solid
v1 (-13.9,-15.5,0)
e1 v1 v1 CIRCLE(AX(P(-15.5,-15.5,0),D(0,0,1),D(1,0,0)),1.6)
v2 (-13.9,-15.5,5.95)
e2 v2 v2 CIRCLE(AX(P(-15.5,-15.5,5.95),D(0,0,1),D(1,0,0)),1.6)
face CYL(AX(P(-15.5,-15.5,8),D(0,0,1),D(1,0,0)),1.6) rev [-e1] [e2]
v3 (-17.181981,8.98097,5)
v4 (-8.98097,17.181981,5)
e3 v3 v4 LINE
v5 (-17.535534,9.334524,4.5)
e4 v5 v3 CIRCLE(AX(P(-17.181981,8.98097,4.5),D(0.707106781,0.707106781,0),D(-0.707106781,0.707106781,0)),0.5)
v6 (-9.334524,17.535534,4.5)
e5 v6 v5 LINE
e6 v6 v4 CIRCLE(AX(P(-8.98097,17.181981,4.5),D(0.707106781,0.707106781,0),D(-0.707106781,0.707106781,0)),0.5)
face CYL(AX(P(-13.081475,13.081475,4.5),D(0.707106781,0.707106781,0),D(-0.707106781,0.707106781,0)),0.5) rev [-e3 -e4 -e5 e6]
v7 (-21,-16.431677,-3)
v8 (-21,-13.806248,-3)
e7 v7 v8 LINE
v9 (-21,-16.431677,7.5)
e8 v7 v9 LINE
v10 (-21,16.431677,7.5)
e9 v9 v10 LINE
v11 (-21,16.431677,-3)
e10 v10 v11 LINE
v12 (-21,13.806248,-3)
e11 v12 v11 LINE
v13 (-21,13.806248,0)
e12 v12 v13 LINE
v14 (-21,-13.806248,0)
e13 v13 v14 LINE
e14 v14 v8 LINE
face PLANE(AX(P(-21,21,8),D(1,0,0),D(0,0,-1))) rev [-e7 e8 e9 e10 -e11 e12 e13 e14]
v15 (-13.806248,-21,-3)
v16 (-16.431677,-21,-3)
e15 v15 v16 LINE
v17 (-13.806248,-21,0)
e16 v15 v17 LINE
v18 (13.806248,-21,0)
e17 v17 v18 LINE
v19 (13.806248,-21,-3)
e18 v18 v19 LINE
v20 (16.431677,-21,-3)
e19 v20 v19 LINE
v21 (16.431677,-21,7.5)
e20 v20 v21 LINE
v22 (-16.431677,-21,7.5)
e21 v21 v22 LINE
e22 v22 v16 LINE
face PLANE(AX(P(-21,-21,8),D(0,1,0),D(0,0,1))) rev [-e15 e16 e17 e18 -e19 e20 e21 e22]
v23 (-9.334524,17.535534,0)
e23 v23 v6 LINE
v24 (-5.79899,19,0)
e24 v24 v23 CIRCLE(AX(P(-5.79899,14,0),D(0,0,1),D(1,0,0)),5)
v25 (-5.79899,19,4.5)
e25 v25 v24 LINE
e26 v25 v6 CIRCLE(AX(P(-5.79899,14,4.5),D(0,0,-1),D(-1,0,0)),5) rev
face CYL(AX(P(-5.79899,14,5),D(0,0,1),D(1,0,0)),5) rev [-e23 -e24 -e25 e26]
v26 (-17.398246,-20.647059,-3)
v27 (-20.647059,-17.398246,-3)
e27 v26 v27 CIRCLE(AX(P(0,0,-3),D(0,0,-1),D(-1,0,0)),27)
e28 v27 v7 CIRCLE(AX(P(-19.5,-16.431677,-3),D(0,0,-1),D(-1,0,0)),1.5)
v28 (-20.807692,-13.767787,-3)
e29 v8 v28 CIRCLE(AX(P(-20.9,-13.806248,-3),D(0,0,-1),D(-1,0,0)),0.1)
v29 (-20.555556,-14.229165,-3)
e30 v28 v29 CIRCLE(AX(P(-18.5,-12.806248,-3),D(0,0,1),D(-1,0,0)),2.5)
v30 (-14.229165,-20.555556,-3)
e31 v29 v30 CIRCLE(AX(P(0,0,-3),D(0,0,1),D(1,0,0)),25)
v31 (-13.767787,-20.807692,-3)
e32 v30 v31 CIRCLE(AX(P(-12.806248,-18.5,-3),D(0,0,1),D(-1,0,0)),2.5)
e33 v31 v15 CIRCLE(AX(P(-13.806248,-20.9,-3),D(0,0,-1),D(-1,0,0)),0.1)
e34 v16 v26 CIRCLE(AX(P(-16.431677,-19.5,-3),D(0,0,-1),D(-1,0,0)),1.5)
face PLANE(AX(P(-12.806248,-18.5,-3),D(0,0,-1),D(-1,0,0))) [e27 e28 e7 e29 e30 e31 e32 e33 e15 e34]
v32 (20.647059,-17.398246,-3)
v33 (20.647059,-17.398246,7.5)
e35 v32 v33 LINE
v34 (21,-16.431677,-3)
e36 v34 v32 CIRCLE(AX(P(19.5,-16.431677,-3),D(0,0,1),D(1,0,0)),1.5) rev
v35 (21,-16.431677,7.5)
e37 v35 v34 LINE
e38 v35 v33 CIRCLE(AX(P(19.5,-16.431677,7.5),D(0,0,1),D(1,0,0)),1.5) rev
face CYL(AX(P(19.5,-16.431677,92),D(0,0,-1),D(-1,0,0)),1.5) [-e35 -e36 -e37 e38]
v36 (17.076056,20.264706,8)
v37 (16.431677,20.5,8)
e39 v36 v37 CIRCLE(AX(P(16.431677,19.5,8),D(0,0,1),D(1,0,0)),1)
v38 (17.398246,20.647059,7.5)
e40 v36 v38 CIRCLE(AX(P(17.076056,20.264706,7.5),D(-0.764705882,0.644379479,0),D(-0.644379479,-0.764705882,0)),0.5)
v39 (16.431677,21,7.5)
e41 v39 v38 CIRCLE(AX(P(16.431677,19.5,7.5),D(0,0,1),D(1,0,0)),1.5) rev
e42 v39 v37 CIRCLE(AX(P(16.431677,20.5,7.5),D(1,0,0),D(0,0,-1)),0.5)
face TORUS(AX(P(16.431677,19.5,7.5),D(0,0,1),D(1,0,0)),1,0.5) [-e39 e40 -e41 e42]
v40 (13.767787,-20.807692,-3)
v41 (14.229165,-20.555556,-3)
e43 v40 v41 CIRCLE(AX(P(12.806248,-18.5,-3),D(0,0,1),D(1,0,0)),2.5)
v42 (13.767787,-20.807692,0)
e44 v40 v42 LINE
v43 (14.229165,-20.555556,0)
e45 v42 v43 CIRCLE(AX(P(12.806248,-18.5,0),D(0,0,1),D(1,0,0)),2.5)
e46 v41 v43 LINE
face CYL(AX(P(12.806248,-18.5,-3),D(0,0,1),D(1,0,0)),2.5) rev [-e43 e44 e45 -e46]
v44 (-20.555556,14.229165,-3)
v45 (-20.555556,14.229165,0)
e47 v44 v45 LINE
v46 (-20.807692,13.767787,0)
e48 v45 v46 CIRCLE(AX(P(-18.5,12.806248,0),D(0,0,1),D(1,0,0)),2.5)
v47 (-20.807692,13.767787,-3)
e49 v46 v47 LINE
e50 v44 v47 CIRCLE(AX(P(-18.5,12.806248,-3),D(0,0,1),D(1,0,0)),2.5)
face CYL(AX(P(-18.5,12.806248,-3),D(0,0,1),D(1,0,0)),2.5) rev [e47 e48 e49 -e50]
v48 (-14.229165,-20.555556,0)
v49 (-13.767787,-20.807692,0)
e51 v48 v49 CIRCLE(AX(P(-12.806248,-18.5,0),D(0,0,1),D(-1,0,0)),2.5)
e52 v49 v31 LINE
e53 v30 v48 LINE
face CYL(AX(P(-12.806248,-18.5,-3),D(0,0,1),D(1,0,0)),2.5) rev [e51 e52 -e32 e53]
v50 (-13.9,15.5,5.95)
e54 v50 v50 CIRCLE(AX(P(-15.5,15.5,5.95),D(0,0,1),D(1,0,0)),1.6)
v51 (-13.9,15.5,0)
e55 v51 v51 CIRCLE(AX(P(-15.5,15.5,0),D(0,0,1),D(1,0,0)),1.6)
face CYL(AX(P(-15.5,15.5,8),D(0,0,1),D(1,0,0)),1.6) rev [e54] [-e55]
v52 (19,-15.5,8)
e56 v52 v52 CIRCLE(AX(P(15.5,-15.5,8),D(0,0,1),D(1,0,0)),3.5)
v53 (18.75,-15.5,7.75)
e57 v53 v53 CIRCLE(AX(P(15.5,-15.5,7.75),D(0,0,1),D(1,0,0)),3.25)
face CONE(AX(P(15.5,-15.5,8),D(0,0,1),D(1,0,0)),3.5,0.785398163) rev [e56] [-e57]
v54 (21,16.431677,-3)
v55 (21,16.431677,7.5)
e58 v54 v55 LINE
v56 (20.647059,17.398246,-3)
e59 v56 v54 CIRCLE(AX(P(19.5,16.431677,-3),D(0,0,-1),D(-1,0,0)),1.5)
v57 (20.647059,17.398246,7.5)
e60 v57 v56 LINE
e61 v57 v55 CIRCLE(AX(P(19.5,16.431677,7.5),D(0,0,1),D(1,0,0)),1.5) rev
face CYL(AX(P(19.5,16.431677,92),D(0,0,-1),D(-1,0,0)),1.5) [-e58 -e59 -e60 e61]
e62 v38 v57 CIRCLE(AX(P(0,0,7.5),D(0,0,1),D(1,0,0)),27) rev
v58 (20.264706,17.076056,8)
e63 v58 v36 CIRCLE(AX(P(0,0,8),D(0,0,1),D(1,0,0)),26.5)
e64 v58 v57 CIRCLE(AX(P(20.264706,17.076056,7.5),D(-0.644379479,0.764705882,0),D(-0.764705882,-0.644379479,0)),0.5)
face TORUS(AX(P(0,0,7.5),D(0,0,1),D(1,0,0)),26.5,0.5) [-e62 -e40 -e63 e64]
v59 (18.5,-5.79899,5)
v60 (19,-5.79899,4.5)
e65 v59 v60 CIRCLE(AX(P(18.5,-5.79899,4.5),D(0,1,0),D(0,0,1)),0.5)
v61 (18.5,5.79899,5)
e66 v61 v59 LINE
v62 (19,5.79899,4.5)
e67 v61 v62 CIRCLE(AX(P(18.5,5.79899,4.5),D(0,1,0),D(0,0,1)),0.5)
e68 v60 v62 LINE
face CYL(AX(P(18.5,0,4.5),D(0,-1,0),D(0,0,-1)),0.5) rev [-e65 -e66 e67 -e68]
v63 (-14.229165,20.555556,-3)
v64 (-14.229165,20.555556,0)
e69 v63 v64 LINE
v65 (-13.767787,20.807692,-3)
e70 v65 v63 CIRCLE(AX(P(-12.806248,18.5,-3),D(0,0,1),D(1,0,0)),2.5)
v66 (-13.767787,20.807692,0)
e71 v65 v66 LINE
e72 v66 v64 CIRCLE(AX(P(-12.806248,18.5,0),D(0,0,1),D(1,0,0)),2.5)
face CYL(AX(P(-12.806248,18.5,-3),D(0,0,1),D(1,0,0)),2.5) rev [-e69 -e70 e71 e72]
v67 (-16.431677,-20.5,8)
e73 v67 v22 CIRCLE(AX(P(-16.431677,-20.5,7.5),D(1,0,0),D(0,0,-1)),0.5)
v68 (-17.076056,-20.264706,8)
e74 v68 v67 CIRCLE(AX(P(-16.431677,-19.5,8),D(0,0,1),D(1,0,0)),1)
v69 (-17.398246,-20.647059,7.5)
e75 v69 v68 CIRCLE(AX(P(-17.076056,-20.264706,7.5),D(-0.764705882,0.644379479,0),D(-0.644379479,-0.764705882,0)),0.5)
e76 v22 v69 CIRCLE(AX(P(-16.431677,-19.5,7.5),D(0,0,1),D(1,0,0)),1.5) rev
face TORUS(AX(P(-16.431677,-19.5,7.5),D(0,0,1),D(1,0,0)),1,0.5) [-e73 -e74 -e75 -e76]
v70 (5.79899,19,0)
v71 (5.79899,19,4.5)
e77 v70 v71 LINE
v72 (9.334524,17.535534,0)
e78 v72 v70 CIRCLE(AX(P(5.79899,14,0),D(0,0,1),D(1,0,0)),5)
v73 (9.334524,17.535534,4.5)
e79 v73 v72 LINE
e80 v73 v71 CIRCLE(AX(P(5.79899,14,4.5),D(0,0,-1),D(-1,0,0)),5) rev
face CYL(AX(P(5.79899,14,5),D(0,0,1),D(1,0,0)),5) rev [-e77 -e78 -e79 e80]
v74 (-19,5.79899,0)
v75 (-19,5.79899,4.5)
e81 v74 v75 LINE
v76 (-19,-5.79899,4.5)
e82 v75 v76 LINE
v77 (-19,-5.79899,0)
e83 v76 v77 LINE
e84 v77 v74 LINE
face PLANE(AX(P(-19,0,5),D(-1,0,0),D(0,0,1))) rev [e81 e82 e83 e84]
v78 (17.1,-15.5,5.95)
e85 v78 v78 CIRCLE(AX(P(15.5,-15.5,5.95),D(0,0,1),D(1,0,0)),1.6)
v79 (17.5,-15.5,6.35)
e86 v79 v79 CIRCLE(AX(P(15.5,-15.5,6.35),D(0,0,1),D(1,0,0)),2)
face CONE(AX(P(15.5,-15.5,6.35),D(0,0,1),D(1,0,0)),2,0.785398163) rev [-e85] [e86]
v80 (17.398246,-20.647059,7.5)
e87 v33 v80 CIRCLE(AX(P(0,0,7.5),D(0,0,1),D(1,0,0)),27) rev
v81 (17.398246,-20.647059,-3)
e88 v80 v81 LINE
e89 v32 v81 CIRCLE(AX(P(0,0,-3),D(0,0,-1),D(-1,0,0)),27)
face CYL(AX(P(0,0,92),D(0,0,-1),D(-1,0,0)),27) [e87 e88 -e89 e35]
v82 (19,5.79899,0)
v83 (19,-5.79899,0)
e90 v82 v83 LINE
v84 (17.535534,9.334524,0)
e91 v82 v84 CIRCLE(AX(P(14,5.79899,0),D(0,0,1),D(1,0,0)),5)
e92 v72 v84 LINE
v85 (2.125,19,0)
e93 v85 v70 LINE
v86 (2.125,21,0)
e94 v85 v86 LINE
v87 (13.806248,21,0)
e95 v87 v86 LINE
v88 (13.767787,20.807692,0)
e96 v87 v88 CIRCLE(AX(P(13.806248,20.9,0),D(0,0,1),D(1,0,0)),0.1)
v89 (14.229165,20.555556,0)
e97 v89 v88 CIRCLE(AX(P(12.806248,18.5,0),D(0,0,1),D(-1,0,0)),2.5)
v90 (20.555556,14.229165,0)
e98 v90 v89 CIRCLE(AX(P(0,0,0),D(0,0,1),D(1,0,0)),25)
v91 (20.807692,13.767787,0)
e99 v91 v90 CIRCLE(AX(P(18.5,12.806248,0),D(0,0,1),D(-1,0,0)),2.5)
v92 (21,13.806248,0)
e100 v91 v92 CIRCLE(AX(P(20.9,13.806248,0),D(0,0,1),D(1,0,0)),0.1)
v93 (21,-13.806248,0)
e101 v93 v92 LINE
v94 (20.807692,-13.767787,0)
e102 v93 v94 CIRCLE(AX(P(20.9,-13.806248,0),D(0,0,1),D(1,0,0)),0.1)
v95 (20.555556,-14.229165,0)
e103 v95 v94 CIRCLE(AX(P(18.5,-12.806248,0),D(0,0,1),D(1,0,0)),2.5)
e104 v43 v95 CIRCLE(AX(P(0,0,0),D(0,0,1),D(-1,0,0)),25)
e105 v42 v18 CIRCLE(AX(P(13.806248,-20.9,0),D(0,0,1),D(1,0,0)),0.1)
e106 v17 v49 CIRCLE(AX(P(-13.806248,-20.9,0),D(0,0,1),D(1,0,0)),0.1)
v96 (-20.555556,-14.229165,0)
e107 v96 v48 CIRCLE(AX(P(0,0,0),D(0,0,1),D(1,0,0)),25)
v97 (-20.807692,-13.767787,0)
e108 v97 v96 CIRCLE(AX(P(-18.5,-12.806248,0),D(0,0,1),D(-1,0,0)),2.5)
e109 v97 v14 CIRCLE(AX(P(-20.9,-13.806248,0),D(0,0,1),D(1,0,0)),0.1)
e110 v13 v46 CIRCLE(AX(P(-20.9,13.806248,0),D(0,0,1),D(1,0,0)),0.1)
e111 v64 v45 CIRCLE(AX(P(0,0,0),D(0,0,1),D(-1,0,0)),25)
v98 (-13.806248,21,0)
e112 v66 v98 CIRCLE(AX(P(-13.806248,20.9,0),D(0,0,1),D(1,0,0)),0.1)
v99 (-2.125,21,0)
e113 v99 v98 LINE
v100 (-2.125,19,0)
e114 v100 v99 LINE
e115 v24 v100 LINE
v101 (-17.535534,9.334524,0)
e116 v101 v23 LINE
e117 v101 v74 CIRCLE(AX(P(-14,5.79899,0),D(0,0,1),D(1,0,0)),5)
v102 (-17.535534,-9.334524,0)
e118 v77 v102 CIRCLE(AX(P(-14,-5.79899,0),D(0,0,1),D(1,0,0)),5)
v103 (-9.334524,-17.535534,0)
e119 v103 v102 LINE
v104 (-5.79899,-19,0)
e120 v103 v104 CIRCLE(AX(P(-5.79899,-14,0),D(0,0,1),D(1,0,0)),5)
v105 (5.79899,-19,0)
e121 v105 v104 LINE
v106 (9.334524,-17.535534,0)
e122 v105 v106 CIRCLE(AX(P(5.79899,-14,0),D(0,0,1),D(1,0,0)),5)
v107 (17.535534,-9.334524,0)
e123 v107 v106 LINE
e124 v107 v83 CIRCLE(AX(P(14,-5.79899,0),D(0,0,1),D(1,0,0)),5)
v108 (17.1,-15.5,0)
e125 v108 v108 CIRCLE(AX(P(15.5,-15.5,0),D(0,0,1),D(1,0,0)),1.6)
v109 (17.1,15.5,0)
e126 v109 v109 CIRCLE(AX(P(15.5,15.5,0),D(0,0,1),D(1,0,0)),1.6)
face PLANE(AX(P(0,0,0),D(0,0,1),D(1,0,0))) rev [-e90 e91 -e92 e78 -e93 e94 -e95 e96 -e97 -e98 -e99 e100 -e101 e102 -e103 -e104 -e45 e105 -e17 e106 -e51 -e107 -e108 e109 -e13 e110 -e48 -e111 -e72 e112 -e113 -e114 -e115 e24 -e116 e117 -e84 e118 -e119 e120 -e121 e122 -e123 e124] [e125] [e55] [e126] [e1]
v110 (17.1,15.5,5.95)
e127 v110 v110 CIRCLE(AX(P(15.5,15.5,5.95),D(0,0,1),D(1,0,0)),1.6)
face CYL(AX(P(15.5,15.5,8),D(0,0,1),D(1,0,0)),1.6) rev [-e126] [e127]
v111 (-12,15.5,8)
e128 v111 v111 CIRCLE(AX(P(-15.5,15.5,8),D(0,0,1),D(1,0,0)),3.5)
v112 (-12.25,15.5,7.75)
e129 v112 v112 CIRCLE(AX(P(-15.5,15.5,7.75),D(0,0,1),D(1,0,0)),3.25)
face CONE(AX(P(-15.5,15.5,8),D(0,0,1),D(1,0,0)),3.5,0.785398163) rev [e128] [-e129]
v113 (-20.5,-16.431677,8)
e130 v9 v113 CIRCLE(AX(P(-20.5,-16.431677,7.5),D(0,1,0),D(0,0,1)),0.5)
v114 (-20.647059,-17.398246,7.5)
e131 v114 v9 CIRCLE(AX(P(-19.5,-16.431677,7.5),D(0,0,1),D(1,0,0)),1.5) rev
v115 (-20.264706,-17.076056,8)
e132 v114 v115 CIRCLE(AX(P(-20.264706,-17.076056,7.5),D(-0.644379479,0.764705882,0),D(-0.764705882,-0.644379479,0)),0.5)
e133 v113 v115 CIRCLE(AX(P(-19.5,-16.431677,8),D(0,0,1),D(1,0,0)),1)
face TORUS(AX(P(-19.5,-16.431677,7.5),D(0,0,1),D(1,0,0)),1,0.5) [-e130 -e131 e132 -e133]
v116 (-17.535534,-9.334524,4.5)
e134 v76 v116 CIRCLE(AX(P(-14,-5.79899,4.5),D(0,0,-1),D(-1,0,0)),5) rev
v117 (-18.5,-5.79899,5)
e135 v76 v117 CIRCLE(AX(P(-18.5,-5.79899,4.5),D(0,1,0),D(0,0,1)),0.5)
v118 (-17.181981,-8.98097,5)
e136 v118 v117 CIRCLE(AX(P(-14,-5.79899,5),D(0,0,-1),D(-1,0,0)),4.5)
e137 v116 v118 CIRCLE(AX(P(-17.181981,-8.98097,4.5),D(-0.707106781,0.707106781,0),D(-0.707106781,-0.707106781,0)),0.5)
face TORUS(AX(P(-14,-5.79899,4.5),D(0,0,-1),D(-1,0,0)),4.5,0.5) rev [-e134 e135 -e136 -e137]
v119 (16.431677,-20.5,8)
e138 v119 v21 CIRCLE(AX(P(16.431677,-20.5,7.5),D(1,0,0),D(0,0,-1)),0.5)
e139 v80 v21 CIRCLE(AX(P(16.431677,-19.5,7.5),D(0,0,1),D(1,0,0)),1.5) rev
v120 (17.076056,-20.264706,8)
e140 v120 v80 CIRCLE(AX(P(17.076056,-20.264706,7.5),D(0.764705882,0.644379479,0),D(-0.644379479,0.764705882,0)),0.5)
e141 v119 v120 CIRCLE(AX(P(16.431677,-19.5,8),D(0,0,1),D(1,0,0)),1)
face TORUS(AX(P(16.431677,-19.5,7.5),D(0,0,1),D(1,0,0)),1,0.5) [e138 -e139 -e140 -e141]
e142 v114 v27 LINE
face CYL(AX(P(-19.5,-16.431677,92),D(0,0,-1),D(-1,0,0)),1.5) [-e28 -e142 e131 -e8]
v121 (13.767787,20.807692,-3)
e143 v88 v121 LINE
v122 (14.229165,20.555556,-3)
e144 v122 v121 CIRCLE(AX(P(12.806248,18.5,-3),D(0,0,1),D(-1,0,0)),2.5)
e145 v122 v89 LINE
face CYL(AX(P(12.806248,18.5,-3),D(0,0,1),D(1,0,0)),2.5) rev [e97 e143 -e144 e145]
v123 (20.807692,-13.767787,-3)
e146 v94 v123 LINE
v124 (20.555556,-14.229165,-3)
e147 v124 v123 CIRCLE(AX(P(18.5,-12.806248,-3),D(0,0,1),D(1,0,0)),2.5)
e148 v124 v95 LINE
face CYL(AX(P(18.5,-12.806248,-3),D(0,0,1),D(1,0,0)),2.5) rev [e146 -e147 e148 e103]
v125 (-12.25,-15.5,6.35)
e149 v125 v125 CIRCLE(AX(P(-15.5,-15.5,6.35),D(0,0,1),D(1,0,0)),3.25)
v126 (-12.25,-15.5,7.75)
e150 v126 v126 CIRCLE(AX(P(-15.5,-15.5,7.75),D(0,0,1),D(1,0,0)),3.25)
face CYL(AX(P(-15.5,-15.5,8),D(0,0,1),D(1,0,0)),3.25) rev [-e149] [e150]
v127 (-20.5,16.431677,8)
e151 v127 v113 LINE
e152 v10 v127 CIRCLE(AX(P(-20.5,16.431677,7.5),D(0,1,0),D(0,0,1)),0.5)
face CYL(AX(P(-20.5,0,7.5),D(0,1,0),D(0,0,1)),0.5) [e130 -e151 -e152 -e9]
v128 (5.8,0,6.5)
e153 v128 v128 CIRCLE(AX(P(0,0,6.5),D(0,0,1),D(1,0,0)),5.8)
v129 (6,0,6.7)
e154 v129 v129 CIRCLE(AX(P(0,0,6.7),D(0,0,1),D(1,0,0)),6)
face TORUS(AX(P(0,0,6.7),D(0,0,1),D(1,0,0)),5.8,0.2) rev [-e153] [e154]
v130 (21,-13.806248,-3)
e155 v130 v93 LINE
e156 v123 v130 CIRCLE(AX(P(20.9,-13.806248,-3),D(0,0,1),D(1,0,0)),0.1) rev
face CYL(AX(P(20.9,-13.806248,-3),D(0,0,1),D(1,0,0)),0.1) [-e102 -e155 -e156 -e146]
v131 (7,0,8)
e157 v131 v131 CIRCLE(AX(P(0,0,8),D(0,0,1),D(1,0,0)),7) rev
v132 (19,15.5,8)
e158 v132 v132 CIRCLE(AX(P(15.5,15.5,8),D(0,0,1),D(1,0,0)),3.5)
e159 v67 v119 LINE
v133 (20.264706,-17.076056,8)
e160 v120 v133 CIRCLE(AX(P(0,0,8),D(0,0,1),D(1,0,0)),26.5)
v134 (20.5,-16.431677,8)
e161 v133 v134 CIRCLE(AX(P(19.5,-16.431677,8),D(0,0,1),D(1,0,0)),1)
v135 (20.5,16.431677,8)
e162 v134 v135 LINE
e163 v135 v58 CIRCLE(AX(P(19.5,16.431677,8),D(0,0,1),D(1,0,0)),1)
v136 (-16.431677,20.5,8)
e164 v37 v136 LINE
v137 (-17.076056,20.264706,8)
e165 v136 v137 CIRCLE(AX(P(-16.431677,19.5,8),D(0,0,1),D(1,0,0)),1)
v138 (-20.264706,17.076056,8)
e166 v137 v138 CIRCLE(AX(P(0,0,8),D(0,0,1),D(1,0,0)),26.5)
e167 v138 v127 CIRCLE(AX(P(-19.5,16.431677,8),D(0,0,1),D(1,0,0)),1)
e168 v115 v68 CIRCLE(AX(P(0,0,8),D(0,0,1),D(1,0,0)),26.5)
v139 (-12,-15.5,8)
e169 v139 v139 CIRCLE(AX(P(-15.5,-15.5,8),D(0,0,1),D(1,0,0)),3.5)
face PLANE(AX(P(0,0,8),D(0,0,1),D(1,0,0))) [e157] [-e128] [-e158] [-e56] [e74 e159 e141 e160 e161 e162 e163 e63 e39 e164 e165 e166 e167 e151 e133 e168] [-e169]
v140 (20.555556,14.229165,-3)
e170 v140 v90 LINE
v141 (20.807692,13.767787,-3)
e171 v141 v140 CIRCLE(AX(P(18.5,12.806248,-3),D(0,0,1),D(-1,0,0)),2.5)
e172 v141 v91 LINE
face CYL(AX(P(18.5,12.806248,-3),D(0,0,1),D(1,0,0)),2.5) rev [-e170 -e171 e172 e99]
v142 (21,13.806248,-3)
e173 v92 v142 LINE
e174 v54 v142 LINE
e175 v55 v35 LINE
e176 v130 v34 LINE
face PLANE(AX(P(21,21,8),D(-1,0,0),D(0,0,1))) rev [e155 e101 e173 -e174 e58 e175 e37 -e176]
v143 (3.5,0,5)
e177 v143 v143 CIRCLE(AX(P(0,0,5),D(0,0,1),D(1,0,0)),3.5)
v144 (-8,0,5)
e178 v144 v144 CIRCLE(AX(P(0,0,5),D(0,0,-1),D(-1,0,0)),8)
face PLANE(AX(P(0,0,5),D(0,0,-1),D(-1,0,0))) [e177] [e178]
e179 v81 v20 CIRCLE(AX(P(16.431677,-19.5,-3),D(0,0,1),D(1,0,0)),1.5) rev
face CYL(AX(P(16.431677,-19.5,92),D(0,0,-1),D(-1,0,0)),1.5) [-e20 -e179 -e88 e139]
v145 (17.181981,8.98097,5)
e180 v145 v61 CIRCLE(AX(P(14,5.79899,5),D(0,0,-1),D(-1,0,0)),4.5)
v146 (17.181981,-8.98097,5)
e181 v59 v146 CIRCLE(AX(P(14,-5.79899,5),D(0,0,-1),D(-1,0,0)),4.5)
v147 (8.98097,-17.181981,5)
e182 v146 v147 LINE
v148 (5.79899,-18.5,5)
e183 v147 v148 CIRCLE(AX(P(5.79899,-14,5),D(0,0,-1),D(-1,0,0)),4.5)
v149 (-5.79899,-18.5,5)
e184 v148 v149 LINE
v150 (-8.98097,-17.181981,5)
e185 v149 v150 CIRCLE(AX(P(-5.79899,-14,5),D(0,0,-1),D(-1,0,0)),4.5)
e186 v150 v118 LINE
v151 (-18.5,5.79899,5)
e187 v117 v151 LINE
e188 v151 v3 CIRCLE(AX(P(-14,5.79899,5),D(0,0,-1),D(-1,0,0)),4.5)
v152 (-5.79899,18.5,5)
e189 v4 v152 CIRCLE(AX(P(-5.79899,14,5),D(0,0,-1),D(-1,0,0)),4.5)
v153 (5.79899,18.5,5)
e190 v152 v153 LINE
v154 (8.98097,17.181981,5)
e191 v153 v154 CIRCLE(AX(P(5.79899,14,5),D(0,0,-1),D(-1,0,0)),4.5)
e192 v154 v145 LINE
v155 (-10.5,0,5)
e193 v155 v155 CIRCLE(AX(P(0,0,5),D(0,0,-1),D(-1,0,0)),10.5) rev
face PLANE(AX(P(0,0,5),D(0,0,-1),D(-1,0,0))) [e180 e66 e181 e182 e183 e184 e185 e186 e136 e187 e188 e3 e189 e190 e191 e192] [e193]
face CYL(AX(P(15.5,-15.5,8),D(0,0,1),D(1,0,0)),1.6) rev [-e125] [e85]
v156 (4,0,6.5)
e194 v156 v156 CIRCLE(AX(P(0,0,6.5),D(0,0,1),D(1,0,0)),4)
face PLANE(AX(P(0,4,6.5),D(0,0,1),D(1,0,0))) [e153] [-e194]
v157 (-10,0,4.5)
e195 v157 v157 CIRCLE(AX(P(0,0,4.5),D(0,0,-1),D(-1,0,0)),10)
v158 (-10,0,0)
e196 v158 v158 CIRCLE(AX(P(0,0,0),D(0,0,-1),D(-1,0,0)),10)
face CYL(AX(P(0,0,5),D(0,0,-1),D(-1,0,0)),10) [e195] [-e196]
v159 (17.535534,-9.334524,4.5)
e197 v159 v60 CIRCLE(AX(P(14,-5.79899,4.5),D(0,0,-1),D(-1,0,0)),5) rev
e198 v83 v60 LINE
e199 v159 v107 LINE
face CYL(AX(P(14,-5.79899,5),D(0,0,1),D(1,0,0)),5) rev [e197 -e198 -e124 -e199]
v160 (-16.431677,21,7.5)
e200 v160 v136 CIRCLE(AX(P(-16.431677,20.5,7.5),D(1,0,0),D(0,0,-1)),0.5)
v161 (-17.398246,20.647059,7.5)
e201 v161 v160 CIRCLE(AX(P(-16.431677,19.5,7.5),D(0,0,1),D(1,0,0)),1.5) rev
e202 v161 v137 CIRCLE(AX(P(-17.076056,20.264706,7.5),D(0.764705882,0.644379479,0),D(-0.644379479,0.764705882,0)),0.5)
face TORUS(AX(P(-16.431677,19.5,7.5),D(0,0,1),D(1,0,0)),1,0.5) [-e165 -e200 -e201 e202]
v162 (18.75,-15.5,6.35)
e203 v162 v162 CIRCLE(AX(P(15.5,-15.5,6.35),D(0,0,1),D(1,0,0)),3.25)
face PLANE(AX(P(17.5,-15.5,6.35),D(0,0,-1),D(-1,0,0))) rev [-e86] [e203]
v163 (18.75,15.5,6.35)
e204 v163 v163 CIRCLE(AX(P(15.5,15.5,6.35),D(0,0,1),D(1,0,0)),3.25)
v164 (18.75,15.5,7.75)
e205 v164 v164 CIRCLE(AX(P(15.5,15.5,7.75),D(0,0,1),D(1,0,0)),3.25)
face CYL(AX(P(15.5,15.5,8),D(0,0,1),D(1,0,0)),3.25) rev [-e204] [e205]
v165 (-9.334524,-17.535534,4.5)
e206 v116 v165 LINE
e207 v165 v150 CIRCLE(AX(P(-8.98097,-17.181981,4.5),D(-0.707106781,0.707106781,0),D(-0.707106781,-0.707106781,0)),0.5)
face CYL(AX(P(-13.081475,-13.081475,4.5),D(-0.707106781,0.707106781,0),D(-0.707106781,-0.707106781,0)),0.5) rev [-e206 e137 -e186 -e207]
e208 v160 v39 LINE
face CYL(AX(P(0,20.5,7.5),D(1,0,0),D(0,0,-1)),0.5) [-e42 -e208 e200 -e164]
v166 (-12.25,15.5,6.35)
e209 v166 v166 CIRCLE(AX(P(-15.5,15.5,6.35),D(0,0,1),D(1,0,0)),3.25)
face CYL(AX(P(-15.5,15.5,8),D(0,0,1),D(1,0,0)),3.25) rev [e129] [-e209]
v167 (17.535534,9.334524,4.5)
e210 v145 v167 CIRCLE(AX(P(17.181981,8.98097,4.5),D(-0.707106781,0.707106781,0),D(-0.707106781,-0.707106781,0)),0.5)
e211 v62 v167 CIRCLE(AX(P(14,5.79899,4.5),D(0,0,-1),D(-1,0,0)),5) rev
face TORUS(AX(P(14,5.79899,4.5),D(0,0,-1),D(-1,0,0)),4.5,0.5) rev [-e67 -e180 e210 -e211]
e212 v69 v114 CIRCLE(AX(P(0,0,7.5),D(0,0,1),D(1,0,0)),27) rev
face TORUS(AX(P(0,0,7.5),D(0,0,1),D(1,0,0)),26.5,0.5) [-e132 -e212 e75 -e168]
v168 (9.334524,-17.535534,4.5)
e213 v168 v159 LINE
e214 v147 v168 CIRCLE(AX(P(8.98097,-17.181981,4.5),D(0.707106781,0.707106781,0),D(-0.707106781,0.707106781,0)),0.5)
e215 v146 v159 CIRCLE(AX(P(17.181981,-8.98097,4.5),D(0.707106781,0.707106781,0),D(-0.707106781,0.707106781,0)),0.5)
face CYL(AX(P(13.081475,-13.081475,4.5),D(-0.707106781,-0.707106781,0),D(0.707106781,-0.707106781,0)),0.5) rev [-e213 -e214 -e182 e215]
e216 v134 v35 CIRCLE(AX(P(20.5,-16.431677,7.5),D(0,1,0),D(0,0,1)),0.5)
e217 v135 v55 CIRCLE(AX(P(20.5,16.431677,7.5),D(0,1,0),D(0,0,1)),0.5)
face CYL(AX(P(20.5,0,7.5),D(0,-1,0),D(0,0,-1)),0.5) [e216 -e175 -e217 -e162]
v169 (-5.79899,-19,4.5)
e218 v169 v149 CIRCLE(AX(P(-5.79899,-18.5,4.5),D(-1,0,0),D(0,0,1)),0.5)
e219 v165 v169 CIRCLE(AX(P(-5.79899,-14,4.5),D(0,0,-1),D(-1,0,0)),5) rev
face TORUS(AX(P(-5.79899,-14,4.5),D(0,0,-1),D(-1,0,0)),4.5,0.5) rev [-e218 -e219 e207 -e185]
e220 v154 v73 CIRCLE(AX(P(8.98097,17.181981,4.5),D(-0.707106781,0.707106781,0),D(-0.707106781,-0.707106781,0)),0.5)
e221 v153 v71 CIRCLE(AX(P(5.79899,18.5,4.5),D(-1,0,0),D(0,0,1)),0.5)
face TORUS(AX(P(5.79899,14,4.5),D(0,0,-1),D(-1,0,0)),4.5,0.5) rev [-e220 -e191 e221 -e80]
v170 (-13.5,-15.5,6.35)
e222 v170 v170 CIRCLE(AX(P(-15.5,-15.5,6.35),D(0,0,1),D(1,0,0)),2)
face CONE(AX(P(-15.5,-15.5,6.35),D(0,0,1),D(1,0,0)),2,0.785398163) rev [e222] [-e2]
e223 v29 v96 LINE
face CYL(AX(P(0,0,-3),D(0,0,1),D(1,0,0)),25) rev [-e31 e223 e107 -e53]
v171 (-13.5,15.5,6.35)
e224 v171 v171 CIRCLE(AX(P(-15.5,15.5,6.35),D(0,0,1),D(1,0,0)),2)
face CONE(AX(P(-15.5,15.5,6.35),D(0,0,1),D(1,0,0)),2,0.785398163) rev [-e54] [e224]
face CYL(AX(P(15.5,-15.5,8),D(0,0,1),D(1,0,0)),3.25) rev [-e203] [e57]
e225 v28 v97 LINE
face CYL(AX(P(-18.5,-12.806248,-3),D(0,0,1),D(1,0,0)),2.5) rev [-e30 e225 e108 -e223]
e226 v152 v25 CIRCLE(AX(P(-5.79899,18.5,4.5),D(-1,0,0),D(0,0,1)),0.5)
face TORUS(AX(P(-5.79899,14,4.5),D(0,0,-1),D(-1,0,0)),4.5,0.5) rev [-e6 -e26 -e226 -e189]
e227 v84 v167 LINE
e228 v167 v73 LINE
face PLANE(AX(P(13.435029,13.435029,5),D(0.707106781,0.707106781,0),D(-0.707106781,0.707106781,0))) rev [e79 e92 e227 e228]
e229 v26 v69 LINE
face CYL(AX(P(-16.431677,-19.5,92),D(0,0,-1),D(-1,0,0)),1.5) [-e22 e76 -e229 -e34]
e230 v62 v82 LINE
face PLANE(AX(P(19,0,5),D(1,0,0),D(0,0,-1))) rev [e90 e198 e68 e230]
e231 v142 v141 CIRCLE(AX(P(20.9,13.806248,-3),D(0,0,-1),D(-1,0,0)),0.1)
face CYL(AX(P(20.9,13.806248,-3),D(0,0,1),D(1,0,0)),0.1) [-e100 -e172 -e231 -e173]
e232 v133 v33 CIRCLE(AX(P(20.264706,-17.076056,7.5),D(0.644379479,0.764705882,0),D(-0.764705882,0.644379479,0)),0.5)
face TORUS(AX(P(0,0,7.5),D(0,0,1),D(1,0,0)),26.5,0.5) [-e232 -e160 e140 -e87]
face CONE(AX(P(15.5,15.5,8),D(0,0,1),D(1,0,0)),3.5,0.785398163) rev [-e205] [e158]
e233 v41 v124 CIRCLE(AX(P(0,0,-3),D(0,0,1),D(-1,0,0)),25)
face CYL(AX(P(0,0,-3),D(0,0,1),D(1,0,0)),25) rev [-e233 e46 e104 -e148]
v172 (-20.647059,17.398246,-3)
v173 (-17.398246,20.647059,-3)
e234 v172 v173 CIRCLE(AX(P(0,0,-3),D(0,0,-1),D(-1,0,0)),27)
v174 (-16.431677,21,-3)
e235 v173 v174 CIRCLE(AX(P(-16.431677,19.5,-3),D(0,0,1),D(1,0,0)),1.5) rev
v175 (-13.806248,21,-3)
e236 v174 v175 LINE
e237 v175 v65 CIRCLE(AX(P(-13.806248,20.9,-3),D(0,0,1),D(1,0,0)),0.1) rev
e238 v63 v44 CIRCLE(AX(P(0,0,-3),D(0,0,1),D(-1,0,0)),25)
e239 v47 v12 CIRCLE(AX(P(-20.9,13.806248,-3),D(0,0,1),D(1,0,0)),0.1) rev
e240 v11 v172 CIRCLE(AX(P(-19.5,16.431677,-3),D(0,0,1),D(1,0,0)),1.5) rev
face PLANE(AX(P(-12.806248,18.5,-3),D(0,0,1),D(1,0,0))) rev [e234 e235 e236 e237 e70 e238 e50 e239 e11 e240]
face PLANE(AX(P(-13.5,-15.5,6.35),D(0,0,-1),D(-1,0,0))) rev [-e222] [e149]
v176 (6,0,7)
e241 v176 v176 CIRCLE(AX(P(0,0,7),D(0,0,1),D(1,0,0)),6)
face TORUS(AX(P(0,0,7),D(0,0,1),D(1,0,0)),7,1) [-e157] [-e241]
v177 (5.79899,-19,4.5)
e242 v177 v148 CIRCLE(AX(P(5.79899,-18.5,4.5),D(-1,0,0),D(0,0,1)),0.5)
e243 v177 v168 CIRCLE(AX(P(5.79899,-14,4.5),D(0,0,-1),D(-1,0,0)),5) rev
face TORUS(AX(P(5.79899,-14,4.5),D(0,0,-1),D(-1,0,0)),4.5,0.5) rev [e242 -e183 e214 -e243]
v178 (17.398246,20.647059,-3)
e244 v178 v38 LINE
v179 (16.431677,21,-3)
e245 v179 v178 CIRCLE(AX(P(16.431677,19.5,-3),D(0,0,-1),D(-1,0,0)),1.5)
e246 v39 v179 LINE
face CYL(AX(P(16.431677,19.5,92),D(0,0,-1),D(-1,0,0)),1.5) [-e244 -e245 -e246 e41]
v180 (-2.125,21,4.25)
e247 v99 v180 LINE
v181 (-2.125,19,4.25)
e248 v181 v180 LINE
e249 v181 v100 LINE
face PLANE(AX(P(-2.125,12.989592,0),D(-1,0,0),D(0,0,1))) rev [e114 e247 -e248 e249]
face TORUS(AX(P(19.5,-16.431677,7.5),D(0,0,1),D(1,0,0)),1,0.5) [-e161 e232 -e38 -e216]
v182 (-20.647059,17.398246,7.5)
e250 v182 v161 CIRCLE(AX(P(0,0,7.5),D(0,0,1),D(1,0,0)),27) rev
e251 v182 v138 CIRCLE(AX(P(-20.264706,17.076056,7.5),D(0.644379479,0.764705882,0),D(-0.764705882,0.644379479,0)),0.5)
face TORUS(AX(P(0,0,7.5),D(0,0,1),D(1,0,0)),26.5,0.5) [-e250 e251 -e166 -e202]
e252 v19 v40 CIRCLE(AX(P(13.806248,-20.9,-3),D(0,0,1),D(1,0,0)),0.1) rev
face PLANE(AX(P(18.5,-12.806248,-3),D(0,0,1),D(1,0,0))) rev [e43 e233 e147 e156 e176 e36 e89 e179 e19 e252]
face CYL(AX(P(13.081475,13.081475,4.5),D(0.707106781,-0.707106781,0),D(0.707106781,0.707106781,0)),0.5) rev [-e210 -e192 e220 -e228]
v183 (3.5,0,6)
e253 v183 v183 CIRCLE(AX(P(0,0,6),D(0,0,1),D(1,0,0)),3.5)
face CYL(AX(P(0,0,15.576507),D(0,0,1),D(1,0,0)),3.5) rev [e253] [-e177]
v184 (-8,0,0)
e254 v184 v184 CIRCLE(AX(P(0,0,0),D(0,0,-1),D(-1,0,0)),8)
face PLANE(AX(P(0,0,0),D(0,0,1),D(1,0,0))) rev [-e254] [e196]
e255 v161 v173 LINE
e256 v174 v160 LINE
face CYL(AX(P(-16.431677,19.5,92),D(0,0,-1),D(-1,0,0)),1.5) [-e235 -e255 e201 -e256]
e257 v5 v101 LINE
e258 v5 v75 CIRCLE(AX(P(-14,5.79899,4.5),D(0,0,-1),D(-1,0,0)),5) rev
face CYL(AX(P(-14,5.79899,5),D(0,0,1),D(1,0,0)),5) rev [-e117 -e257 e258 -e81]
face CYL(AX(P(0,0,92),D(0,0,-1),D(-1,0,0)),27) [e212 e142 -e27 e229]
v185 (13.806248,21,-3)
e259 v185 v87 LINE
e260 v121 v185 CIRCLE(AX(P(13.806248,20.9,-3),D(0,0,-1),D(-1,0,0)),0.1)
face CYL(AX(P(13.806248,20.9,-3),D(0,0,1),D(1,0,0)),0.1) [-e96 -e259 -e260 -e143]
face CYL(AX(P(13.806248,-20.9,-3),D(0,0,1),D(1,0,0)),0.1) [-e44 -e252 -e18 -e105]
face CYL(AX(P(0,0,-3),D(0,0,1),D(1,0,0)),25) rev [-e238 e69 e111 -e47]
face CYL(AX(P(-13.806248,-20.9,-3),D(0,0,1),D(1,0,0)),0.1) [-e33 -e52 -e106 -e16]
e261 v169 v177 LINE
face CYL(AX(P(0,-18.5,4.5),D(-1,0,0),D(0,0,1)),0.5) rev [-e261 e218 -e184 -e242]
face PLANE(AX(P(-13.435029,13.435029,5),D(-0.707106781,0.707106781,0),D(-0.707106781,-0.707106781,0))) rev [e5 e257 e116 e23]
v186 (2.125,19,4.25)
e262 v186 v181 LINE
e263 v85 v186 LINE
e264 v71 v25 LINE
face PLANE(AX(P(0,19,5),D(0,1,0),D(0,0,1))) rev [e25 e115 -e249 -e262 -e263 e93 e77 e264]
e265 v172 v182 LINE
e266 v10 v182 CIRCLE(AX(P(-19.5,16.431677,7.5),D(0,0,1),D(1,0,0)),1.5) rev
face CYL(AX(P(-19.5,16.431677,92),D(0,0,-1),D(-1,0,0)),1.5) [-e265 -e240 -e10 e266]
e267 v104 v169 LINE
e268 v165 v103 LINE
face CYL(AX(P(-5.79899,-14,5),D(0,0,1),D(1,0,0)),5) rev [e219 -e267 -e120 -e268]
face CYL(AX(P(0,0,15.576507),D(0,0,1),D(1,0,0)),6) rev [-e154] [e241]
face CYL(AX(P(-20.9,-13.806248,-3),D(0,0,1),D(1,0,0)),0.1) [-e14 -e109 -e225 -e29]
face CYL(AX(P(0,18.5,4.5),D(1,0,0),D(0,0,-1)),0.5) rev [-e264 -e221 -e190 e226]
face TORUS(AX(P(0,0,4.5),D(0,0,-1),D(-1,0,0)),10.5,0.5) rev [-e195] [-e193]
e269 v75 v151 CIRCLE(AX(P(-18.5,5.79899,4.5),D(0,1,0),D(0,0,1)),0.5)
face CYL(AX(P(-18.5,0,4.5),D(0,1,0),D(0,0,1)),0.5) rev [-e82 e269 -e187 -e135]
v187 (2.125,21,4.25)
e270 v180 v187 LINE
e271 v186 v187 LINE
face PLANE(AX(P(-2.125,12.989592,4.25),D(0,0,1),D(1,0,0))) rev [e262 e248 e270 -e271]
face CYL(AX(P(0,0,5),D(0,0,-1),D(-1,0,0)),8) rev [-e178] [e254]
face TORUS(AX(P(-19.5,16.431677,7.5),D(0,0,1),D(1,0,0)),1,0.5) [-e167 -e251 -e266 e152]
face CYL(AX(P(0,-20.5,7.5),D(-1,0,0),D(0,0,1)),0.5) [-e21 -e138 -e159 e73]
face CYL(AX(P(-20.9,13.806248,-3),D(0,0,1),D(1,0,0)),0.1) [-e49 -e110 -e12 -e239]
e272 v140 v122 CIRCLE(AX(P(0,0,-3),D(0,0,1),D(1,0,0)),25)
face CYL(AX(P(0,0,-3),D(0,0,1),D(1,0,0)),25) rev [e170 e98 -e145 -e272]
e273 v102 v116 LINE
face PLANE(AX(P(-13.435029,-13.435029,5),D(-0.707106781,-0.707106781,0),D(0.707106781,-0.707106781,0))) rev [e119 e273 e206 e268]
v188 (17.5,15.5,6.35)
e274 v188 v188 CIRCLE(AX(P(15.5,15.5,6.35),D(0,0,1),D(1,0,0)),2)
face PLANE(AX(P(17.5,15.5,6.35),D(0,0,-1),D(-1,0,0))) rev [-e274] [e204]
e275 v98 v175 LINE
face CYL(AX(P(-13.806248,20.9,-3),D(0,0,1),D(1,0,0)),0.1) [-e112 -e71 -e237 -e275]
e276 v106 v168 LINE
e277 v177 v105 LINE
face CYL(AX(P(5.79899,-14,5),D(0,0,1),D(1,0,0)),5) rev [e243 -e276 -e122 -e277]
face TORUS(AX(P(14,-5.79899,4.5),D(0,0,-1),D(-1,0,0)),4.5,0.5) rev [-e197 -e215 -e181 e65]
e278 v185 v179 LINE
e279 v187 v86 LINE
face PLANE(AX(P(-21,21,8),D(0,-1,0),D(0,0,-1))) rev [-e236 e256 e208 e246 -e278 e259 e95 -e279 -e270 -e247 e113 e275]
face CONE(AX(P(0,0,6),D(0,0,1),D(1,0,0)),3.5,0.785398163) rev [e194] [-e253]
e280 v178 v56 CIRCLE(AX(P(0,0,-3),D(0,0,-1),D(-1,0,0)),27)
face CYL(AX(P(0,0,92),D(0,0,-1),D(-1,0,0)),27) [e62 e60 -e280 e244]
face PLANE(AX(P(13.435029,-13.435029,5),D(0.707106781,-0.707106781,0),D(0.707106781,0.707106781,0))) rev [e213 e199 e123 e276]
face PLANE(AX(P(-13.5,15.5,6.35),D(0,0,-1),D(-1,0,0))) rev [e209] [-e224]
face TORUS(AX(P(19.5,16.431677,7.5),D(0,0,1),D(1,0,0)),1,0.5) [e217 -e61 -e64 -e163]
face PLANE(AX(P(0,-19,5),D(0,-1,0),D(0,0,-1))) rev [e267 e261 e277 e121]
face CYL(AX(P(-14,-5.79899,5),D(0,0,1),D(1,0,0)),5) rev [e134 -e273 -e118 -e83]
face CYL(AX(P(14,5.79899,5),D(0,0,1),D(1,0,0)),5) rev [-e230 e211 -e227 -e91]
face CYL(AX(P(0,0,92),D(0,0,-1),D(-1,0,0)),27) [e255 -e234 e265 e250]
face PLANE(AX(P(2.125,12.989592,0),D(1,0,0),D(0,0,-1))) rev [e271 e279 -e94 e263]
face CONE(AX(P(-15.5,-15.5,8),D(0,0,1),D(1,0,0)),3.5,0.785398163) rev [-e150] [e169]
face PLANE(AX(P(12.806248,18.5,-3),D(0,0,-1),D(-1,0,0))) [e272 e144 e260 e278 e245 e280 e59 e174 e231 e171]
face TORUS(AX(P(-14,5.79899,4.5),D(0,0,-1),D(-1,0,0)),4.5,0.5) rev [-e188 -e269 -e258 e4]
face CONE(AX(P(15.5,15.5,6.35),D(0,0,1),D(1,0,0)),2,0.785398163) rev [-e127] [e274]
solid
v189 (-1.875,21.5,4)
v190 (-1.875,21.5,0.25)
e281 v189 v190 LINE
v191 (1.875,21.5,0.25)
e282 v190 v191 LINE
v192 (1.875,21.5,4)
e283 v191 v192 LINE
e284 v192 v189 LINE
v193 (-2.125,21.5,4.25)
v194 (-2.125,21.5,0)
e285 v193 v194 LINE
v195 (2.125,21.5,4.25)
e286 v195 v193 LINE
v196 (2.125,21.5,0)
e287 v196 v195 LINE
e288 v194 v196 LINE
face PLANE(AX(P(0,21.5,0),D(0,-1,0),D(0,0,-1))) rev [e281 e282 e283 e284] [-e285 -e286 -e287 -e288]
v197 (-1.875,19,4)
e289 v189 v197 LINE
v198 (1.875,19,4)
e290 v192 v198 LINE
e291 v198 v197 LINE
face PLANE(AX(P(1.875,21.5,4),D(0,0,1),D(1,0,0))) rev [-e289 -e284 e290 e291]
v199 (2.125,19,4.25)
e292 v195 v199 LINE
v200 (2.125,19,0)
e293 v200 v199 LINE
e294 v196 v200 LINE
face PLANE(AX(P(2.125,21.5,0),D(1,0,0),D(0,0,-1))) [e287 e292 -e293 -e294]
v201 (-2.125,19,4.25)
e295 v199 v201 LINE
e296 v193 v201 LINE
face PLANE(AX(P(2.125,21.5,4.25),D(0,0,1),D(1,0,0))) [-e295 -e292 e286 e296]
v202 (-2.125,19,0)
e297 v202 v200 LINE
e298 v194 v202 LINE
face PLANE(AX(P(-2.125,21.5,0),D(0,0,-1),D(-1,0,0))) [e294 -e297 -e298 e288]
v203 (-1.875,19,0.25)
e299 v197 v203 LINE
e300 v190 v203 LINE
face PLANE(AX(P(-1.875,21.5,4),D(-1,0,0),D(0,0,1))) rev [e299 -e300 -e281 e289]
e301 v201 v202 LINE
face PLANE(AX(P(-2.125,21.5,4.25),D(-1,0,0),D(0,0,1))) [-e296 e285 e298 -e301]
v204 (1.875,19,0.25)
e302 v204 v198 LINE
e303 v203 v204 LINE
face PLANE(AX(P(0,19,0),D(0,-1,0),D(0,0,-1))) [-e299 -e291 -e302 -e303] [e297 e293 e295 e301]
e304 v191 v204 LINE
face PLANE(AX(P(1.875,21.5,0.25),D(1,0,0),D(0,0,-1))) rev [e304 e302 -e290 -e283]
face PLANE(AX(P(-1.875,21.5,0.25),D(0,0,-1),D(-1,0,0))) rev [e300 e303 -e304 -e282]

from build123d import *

# Parameters (mm, degrees)
SKETCH1_W                               = 42
SKETCH1_H                               = 42
BOSS_EXTRUDE1_DEPTH                     = 8
BOSS_EXTRUDE2_DEPTH                     = 3
SKETCH3_R                               = 29.69848481
SKETCH3_R_2                             = 27
CUT_EXTRUDE1_DEPTH                      = 11
SKETCH4_R                               = 10
SKETCH4_R_2                             = 8
CUT_EXTRUDE2_DEPTH                      = 5
FILLET3_R                               = 5
FILLET4_R                               = 1.5
FILLET5_START                           = -4
FILLET5_DEPTH                           = 4
FILLET6_R                               = 0.5
FILLET7_R                               = 0.5
CBORE_FOR_M3_PAN_HEAD_SCREW2_AT_2_COUNT = 2
CBORE_FOR_M3_PAN_HEAD_SCREW2_AT_2_PITCH = 43.840620434
CBORE_FOR_M3_PAN_HEAD_SCREW2_AT_3_COUNT = 2
CBORE_FOR_M3_PAN_HEAD_SCREW2_AT_3_PITCH = 31
CBORE_FOR_M3_PAN_HEAD_SCREW2_AT_4_COUNT = 2
CBORE_FOR_M3_PAN_HEAD_SCREW2_AT_4_PITCH = 31
FILLET8_R                               = 1
SKETCH8_W                               = 4.25
SKETCH8_H                               = 4.25
CUT_EXTRUDE3_DEPTH                      = 2
SKETCH9_W                               = 4.25
SKETCH9_H                               = 4.25
SKETCH9_W_2                             = 3.75
SKETCH9_H_2                             = 3.75
BOSS_EXTRUDE3_DEPTH                     = 2.5


with BuildPart() as part:
    # Sketch1 → Boss-Extrude1 (new body)
    with BuildSketch(Plane.XY):
        Rectangle(SKETCH1_W, SKETCH1_H)
    extrude(amount=BOSS_EXTRUDE1_DEPTH)

    # Sketch2 → Boss-Extrude2 (add)
    with BuildSketch(Plane(origin=(0, 0, 0), x_dir=(-1, 0, 0), z_dir=(0, 0, -1))):
        with BuildLine():
            Line((-21, 12.806248475), (-21, 21))
            Line((-21, 21), (-12.806248475, 21))
            ThreePointArc((-12.806248475, 21), (-13.551604467, 20.886303511), (-14.229164972, 20.555555556))
            ThreePointArc((-14.229164972, 20.555555556), (-17.67766953, 17.67766953), (-20.555555556, 14.229164972))
            ThreePointArc((-20.555555556, 14.229164972), (-20.886303511, 13.551604467), (-21, 12.806248475))
        make_face()
        with BuildLine():
            Line((-21, -12.806248475), (-21, -21))
            Line((-21, -21), (-12.806248475, -21))
            ThreePointArc((-12.806248475, -21), (-13.551604467, -20.886303511), (-14.229164972, -20.555555556))
            ThreePointArc((-14.229164972, -20.555555556), (-17.67766953, -17.67766953), (-20.555555556, -14.229164972))
            ThreePointArc((-20.555555556, -14.229164972), (-20.886303511, -13.551604467), (-21, -12.806248475))
        make_face()
        with BuildLine():
            Line((21, 21), (12.806248475, 21))
            ThreePointArc((12.806248475, 21), (13.551604467, 20.886303511), (14.229164972, 20.555555556))
            ThreePointArc((14.229164972, 20.555555556), (17.67766953, 17.67766953), (20.555555556, 14.229164972))
            ThreePointArc((20.555555556, 14.229164972), (20.886303511, 13.551604467), (21, 12.806248475))
            Line((21, 12.806248475), (21, 21))
        make_face()
        with BuildLine():
            Line((21, -12.806248475), (21, -21))
            Line((21, -21), (12.806248475, -21))
            ThreePointArc((12.806248475, -21), (13.551604467, -20.886303511), (14.229164972, -20.555555556))
            ThreePointArc((14.229164972, -20.555555556), (17.67766953, -17.67766953), (20.555555556, -14.229164972))
            ThreePointArc((20.555555556, -14.229164972), (20.886303511, -13.551604467), (21, -12.806248475))
        make_face()
    extrude(amount=BOSS_EXTRUDE2_DEPTH)

    # Sketch3 → Cut-Extrude1 (cut)
    with BuildSketch(Plane(origin=(0, 0, -3), x_dir=(-1, 0, 0), z_dir=(0, 0, -1))):
        Circle(SKETCH3_R)
        Circle(SKETCH3_R_2, mode=Mode.SUBTRACT)
    extrude(amount=-CUT_EXTRUDE1_DEPTH, mode=Mode.SUBTRACT)

    # Sketch4 → Cut-Extrude2 (cut)
    # profile 1 of 2: a face of its own
    with BuildSketch(Plane(origin=(0, 0, 0), x_dir=(-1, 0, 0), z_dir=(0, 0, -1))):
        Polygon((7.870057685, -19), (19, -7.870057685), (19, 7.870057685), (7.870057685, 19), (-7.870057685, 19), (-19, 7.870057685), (-19, -7.870057685), (-7.870057685, -19), align=None)
        Circle(SKETCH4_R, mode=Mode.SUBTRACT)
    # profile 2 of 2: a face of its own
    with BuildSketch(Plane(origin=(0, 0, 0), x_dir=(-1, 0, 0), z_dir=(0, 0, -1))):
        Circle(SKETCH4_R_2)
    extrude(amount=-CUT_EXTRUDE2_DEPTH, mode=Mode.SUBTRACT)

    # Fillet3
    fillet3_edges = [part.edges().sort_by_distance(p)[0] for p in [
        (-19, -7.870057685, 2.5),
        (-7.870057685, -19, 2.5),
        (7.870057685, -19, 2.5),
        (19, -7.870057685, 2.5),
        (19, 7.870057685, 2.5),
        (7.870057685, 19, 2.5),
        (-7.870057685, 19, 2.5),
        (-19, 7.870057685, 2.5),
    ]]
    fillet(fillet3_edges, radius=FILLET3_R)

    # Fillet4
    fillet4_edges = [part.edges().sort_by_distance(p)[0] for p in [
        (21, 16.970562748, 2.5),
        (21, -16.970562748, 2.5),
        (-16.970562748, 21, 2.5),
        (16.970562748, 21, 2.5),
        (-21, -16.970562748, 2.5),
        (-21, 16.970562748, 2.5),
        (16.970562748, -21, 2.5),
        (-16.970562748, -21, 2.5),
    ]]
    fillet(fillet4_edges, radius=FILLET4_R)

    # Fillet5: read off the stored shape, not the designer's step
    # Fillet5 outline → Fillet5 (cut)
    with BuildSketch(Plane.XY.offset(FILLET5_START)):
        with BuildLine():
            ThreePointArc((-13.767786936, 20.807692308), (-13.296538813, 20.95145169), (-12.806248475, 21))
            Line((-12.806248475, 21), (-13.806248475, 21))
            ThreePointArc((-13.806248475, 21), (-13.708190407, 20.919611614), (-13.767786936, 20.807692308))
        make_face()
        with BuildLine():
            ThreePointArc((13.767786936, 20.807692308), (13.708190407, 20.919611614), (13.806248475, 21))
            Line((13.806248475, 21), (12.806248475, 21))
            ThreePointArc((12.806248475, 21), (13.296538813, 20.95145169), (13.767786936, 20.807692308))
        make_face()
        with BuildLine():
            Line((21, -13.806248475), (21, -12.806248475))
            ThreePointArc((21, -12.806248475), (20.95145169, -13.296538813), (20.807692308, -13.767786936))
            ThreePointArc((20.807692308, -13.767786936), (20.919611614, -13.708190407), (21, -13.806248475))
        make_face()
        with BuildLine():
            ThreePointArc((21, 13.806248475), (20.919611614, 13.708190407), (20.807692308, 13.767786936))
            ThreePointArc((20.807692308, 13.767786936), (20.95145169, 13.296538813), (21, 12.806248475))
            Line((21, 12.806248475), (21, 13.806248475))
        make_face()
        with BuildLine():
            Line((-13.806248475, -21), (-12.806248475, -21))
            ThreePointArc((-12.806248475, -21), (-13.296538813, -20.95145169), (-13.767786936, -20.807692308))
            ThreePointArc((-13.767786936, -20.807692308), (-13.708190407, -20.919611614), (-13.806248475, -21))
        make_face()
        with BuildLine():
            ThreePointArc((13.806248475, -21), (13.708190407, -20.919611614), (13.767786936, -20.807692308))
            ThreePointArc((13.767786936, -20.807692308), (13.296538813, -20.95145169), (12.806248475, -21))
            Line((12.806248475, -21), (13.806248475, -21))
        make_face()
        with BuildLine():
            Line((-21, 13.806248475), (-21, 12.806248475))
            ThreePointArc((-21, 12.806248475), (-20.95145169, 13.296538813), (-20.807692308, 13.767786936))
            ThreePointArc((-20.807692308, 13.767786936), (-20.919611614, 13.708190407), (-21, 13.806248475))
        make_face()
        with BuildLine():
            ThreePointArc((-21, -13.806248475), (-20.919611614, -13.708190407), (-20.807692308, -13.767786936))
            ThreePointArc((-20.807692308, -13.767786936), (-20.95145169, -13.296538813), (-21, -12.806248475))
            Line((-21, -12.806248475), (-21, -13.806248475))
        make_face()
    extrude(amount=FILLET5_DEPTH, mode=Mode.SUBTRACT)

    # Fillet6
    fillet6_edges = [part.edges().sort_by_distance(p)[0] for p in [
        (10, 0, 5),
        (-13.435028843, -13.435028843, 5),
        (0, -19, 5),
        (-19, 0, 5),
        (-13.435028843, 13.435028843, 5),
        (0, 19, 5),
        (13.435028843, 13.435028843, 5),
        (19, 0, 5),
        (13.435028843, -13.435028843, 5),
        (7.712407035, 18.619397663, 5),
        (-18.619397663, -7.712407035, 5),
        (-18.619397663, 7.712407035, 5),
        (-7.712407035, 18.619397663, 5),
        (18.619397663, 7.712407035, 5),
        (18.619397663, -7.712407035, 5),
        (7.712407035, -18.619397663, 5),
        (-7.712407035, -18.619397663, 5),
    ]]
    fillet(fillet6_edges, radius=FILLET6_R)

    # Fillet7
    fillet7_edges = [part.edges().sort_by_distance(p)[0] for p in [
        (19.091883092, -19.091883092, 8),
        (21, 0, 8),
        (19.091883092, 19.091883092, 8),
        (0, 21, 8),
        (-19.091883092, 19.091883092, 8),
        (-21, 0, 8),
        (-19.091883092, -19.091883092, 8),
        (0, -21, 8),
        (-16.946172481, -20.909004655, 8),
        (20.909004655, 16.946172481, 8),
        (16.946172481, 20.909004655, 8),
        (-16.946172481, 20.909004655, 8),
        (-20.909004655, 16.946172481, 8),
        (-20.909004655, -16.946172481, 8),
        (16.946172481, -20.909004655, 8),
        (20.909004655, -16.946172481, 8),
    ]]
    fillet(fillet7_edges, radius=FILLET7_R)

    # Sketch6 → CBORE for M3 Pan Head Screw2 (revolve, cut)
    with BuildSketch(Plane(origin=(-15.5, 15.5, 8), x_dir=(0, -1, 0), z_dir=(1, 0, 0))):
        Polygon((0, 0), (0, 11), (1.6, 11), (1.6, 2.05), (2, 1.65), (3.25, 1.65), (3.25, 0.25), (3.5, 0), align=None)
    cbore_for_m3_pan_head_screw2 = revolve(axis=Axis((-15.5, 15.5, 14.35), (0, 0, -1)), mode=Mode.SUBTRACT)

    # CBORE for M3 Pan Head Screw2 at 2: CBORE for M3 Pan Head Screw2 ×2
    with Locations(*[Vector(0.7071067811865476, -0.7071067811865476, 0) * (i * CBORE_FOR_M3_PAN_HEAD_SCREW2_AT_2_PITCH) for i in range(1, CBORE_FOR_M3_PAN_HEAD_SCREW2_AT_2_COUNT)]):
        add(cbore_for_m3_pan_head_screw2, mode=Mode.SUBTRACT)

    # CBORE for M3 Pan Head Screw2 at 3: CBORE for M3 Pan Head Screw2 ×2
    with Locations(*[(0, -i * CBORE_FOR_M3_PAN_HEAD_SCREW2_AT_3_PITCH, 0) for i in range(1, CBORE_FOR_M3_PAN_HEAD_SCREW2_AT_3_COUNT)]):
        add(cbore_for_m3_pan_head_screw2, mode=Mode.SUBTRACT)

    # CBORE for M3 Pan Head Screw2 at 4: CBORE for M3 Pan Head Screw2 ×2
    with Locations(*[(i * CBORE_FOR_M3_PAN_HEAD_SCREW2_AT_4_PITCH, 0, 0) for i in range(1, CBORE_FOR_M3_PAN_HEAD_SCREW2_AT_4_COUNT)]):
        add(cbore_for_m3_pan_head_screw2, mode=Mode.SUBTRACT)

    # Sketch7 → Cut-Revolve1 (revolve, cut)
    with BuildSketch(Plane(origin=(0, 0, 0), x_dir=(0, 0, -1), z_dir=(1, 0, 0)), mode=Mode.PRIVATE) as cut_revolve1_sk:
        with BuildLine():
            Line((-5, 0), (-5, 3.5))
            Line((-5, 3.5), (-6, 3.5))
            Line((-6, 3.5), (-6.5, 4))
            Line((-6.5, 4), (-6.5, 5.8))
            ThreePointArc((-6.5, 5.8), (-6.558578644, 5.941421356), (-6.7, 6))
            Line((-6.7, 6), (-8, 6))
            Line((-8, 6), (-8, 0))
            Line((-8, 0), (-5, 0))
        make_face()
    revolve(cut_revolve1_sk.sketch.rotate(Axis((0, 0, 15.576507328), (0, 0, -1)), 90), axis=Axis((0, 0, 15.576507328), (0, 0, -1)), mode=Mode.SUBTRACT)

    # Fillet8
    fillet8_edges = [part.edges().sort_by_distance(p)[0] for p in [
        (-6, 0, 8),
    ]]
    fillet(fillet8_edges, radius=FILLET8_R)

    # Sketch8 → Cut-Extrude3 (cut)
    with BuildSketch(Plane(origin=(0, 21, 0), x_dir=(1, 0, 0), z_dir=(0, 1, 0))):
        with Locations((0, -2.125)):
            Rectangle(SKETCH8_W, SKETCH8_H)
    extrude(amount=-CUT_EXTRUDE3_DEPTH, mode=Mode.SUBTRACT)


with BuildPart() as body_2:
    # Sketch9 → Boss-Extrude3 (new body)
    with BuildSketch(Plane.XZ.offset(-19)):
        with Locations((0, 2.125)):
            Rectangle(SKETCH9_W, SKETCH9_H)
        with Locations((0, 2.125)):
            Rectangle(SKETCH9_W_2, SKETCH9_H_2, mode=Mode.SUBTRACT)
    extrude(amount=-BOSS_EXTRUDE3_DEPTH)


solid = Compound([part.part, body_2.part])
